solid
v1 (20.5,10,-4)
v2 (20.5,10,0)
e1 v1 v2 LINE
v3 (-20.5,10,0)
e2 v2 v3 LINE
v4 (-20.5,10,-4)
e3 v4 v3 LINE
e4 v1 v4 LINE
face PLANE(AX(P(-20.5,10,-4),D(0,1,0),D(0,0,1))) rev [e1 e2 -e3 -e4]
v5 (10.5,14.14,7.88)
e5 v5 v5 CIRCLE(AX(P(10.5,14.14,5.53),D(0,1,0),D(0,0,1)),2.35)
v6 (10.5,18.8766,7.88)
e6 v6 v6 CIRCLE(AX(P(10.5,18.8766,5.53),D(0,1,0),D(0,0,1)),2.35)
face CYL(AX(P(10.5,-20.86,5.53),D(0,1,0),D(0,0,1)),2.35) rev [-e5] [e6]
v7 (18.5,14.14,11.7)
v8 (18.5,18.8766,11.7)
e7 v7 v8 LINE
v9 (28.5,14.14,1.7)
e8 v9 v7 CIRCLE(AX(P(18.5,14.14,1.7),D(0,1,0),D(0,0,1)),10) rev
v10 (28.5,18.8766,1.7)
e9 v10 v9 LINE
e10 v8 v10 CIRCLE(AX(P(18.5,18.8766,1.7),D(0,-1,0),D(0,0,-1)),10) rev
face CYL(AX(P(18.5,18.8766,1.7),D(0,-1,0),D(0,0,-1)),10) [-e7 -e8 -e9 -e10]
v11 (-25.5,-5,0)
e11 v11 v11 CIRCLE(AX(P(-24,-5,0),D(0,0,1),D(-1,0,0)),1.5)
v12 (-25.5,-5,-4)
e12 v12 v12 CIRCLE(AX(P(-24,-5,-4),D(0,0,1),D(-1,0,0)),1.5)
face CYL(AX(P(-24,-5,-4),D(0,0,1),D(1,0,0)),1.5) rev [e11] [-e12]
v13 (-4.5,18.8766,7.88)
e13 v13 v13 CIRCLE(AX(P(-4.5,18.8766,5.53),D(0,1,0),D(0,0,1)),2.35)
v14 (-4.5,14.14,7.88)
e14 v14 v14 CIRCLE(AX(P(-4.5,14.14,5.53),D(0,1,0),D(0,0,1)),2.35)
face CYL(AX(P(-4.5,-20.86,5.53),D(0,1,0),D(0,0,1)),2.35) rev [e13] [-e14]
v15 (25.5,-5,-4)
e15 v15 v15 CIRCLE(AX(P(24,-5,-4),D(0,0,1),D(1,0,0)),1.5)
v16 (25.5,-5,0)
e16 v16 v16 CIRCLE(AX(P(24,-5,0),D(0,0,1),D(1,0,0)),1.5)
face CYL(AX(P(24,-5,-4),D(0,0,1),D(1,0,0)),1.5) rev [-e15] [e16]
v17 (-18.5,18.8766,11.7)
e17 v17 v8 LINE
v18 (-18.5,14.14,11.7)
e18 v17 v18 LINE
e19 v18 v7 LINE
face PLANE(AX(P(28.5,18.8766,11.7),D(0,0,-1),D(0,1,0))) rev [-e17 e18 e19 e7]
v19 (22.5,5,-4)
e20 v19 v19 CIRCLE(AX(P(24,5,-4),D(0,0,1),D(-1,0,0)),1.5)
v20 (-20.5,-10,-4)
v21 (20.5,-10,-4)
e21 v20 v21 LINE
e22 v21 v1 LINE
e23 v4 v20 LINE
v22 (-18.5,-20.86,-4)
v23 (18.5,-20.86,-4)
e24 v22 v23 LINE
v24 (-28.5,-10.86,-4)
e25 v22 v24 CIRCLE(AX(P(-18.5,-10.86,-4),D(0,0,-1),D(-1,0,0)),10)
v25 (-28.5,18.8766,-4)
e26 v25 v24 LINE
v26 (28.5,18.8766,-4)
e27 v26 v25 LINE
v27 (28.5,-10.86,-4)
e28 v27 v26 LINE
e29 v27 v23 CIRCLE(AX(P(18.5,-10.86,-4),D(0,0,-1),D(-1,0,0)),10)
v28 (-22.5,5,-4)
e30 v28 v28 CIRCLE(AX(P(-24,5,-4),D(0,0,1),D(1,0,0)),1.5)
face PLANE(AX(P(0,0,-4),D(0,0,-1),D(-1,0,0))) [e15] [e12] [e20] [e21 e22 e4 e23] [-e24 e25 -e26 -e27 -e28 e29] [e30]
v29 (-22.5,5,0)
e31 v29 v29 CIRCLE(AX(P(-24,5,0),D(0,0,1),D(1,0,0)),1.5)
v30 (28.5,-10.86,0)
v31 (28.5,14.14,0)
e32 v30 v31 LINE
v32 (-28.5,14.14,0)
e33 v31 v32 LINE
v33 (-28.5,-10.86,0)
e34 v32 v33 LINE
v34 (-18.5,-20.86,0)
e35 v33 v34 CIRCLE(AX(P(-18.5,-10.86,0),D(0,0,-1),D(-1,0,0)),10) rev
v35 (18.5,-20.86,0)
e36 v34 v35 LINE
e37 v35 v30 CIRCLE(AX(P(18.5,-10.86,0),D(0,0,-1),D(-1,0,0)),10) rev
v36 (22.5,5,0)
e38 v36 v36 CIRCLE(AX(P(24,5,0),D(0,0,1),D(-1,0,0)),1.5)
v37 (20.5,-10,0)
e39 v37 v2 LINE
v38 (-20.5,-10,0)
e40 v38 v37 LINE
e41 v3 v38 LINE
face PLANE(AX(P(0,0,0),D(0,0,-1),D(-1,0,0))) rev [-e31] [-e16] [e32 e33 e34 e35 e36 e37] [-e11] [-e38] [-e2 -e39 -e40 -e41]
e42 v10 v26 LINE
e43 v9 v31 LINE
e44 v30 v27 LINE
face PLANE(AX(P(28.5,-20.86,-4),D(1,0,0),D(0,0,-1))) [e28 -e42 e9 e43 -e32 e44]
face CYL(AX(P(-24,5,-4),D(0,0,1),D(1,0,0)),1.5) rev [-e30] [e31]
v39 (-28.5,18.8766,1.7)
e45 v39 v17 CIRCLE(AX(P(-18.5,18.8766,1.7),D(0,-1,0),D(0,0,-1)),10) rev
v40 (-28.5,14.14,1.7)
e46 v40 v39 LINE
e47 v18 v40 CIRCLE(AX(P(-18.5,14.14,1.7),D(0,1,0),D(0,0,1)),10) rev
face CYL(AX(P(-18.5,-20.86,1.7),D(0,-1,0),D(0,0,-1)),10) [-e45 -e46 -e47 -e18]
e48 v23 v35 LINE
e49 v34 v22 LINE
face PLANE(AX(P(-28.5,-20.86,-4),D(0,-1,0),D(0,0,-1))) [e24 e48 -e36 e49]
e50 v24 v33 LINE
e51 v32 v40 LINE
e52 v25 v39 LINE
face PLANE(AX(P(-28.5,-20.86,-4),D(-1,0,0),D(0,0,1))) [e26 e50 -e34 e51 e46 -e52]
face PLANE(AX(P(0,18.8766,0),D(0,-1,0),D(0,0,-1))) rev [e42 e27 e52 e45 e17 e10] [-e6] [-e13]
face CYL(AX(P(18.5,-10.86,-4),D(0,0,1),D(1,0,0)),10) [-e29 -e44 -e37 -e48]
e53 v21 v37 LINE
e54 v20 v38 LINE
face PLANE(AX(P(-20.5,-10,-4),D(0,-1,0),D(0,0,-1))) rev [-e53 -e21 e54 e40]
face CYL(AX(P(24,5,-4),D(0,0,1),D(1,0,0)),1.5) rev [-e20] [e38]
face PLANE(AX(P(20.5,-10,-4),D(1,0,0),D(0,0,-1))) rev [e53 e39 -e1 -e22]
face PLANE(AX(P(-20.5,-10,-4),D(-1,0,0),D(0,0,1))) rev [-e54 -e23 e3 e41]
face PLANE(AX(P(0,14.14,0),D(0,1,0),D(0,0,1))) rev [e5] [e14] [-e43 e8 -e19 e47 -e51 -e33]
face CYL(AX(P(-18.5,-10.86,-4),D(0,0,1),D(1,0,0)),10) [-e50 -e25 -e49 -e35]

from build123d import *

# Parameters (mm, degrees)
SKETCH1_W           = 57
SKETCH1_H           = 35
SKETCH1_R           = 1.5
SKETCH1_W_2         = 41
SKETCH1_H_2         = 20
BASE_FLANGE2_DEPTH  = 4
EDGE_FLANGE1_DEPTH  = 57
FILLET1_R           = 10
SKETCH22_R          = 2.35
CUT_EXTRUDE4_DEPTH  = 10
SKETCH17_W          = 57
SKETCH17_H          = 15.7
BOSS_EXTRUDE1_DEPTH = 4.7366
SKETCH25_R          = 2.35
CUT_EXTRUDE5_DEPTH  = 51.280586508
FILLET2_R           = 10


# Sheet-metal steps are written as plain solids
with BuildPart() as part:
    # Sketch1 → Base-Flange2 (new body)
    with BuildSketch(Plane.XY):
        with Locations((0, -3.36)):
            Rectangle(SKETCH1_W, SKETCH1_H)
        with Locations((-24, 5)):
            Circle(SKETCH1_R, mode=Mode.SUBTRACT)
        with Locations(Location((24, 5, 0), (0, 0, 180))):
            Circle(SKETCH1_R, mode=Mode.SUBTRACT)
        with Locations((24, -5)):
            Circle(SKETCH1_R, mode=Mode.SUBTRACT)
        with Locations(Location((-24, -5, 0), (0, 0, 180))):
            Circle(SKETCH1_R, mode=Mode.SUBTRACT)
        Rectangle(SKETCH1_W_2, SKETCH1_H_2, mode=Mode.SUBTRACT)
    extrude(amount=-BASE_FLANGE2_DEPTH)

    # Edge-Flange1 section (across the edge) → Edge-Flange1 (add)
    with BuildSketch(Plane(origin=(28.5, 14.8766, 0), x_dir=(0, -1, 0), z_dir=(-1, 0, 0))):
        with BuildLine():
            Line((-4, 0.7366), (-4, 11.7))
            Line((-4, 11.7), (0, 11.7))
            Line((0, 11.7), (0, 0.7366))
            ThreePointArc((0, 0.7366), (0.215745145, 0.215745145), (0.7366, 0))
            Line((0.7366, 0), (0.7366, -4))
            ThreePointArc((0.7366, -4), (-2.61268198, -2.61268198), (-4, 0.7366))
        make_face()
    extrude(amount=EDGE_FLANGE1_DEPTH)

    # Fillet1
    fillet1_edges = [part.edges().sort_by_distance(p)[0] for p in [
        (28.5, 16.8766, 11.7),
        (-28.5, 16.8766, 11.7),
        (28.5, -20.86, -2),
        (-28.5, -20.86, -2),
    ]]
    fillet(fillet1_edges, radius=FILLET1_R)

    # Sketch22 → Cut-Extrude4 (cut)
    with BuildSketch(Plane(origin=(0, 18.8766, 0), x_dir=(1, 0, 0), z_dir=(0, 1, 0))):
        with Locations(Location((-4.5, -5.521282453, 0), (0, 0, 270))):
            Circle(SKETCH22_R)
        with Locations(Location((10.5, -5.521282453, 0), (0, 0, 270))):
            Circle(SKETCH22_R)
    extrude(amount=-CUT_EXTRUDE4_DEPTH, mode=Mode.SUBTRACT)

    # Sketch17 → Boss-Extrude1 (add)
    with BuildSketch(Plane(origin=(0, 18.8766, 0), x_dir=(1, 0, 0), z_dir=(0, 1, 0))):
        with Locations((0, -3.85)):
            Rectangle(SKETCH17_W, SKETCH17_H)
    extrude(amount=-BOSS_EXTRUDE1_DEPTH)

    # Sketch25 → Cut-Extrude5 (cut, through all)
    with BuildSketch(Plane(origin=(0, 18.8766, 0), x_dir=(1, 0, 0), z_dir=(0, 1, 0))):
        with Locations(Location((-4.5, -5.53, 0), (0, 0, 270))):
            Circle(SKETCH25_R)
        with Locations(Location((10.5, -5.53, 0), (0, 0, 270))):
            Circle(SKETCH25_R)
    extrude(amount=-CUT_EXTRUDE5_DEPTH, mode=Mode.SUBTRACT)

    # Fillet2
    fillet2_edges = [part.edges().sort_by_distance(p)[0] for p in [
        (-28.5, 16.5083, 11.7),
        (28.5, 16.5083, 11.7),
    ]]
    fillet(fillet2_edges, radius=FILLET2_R)


solid = part.part
